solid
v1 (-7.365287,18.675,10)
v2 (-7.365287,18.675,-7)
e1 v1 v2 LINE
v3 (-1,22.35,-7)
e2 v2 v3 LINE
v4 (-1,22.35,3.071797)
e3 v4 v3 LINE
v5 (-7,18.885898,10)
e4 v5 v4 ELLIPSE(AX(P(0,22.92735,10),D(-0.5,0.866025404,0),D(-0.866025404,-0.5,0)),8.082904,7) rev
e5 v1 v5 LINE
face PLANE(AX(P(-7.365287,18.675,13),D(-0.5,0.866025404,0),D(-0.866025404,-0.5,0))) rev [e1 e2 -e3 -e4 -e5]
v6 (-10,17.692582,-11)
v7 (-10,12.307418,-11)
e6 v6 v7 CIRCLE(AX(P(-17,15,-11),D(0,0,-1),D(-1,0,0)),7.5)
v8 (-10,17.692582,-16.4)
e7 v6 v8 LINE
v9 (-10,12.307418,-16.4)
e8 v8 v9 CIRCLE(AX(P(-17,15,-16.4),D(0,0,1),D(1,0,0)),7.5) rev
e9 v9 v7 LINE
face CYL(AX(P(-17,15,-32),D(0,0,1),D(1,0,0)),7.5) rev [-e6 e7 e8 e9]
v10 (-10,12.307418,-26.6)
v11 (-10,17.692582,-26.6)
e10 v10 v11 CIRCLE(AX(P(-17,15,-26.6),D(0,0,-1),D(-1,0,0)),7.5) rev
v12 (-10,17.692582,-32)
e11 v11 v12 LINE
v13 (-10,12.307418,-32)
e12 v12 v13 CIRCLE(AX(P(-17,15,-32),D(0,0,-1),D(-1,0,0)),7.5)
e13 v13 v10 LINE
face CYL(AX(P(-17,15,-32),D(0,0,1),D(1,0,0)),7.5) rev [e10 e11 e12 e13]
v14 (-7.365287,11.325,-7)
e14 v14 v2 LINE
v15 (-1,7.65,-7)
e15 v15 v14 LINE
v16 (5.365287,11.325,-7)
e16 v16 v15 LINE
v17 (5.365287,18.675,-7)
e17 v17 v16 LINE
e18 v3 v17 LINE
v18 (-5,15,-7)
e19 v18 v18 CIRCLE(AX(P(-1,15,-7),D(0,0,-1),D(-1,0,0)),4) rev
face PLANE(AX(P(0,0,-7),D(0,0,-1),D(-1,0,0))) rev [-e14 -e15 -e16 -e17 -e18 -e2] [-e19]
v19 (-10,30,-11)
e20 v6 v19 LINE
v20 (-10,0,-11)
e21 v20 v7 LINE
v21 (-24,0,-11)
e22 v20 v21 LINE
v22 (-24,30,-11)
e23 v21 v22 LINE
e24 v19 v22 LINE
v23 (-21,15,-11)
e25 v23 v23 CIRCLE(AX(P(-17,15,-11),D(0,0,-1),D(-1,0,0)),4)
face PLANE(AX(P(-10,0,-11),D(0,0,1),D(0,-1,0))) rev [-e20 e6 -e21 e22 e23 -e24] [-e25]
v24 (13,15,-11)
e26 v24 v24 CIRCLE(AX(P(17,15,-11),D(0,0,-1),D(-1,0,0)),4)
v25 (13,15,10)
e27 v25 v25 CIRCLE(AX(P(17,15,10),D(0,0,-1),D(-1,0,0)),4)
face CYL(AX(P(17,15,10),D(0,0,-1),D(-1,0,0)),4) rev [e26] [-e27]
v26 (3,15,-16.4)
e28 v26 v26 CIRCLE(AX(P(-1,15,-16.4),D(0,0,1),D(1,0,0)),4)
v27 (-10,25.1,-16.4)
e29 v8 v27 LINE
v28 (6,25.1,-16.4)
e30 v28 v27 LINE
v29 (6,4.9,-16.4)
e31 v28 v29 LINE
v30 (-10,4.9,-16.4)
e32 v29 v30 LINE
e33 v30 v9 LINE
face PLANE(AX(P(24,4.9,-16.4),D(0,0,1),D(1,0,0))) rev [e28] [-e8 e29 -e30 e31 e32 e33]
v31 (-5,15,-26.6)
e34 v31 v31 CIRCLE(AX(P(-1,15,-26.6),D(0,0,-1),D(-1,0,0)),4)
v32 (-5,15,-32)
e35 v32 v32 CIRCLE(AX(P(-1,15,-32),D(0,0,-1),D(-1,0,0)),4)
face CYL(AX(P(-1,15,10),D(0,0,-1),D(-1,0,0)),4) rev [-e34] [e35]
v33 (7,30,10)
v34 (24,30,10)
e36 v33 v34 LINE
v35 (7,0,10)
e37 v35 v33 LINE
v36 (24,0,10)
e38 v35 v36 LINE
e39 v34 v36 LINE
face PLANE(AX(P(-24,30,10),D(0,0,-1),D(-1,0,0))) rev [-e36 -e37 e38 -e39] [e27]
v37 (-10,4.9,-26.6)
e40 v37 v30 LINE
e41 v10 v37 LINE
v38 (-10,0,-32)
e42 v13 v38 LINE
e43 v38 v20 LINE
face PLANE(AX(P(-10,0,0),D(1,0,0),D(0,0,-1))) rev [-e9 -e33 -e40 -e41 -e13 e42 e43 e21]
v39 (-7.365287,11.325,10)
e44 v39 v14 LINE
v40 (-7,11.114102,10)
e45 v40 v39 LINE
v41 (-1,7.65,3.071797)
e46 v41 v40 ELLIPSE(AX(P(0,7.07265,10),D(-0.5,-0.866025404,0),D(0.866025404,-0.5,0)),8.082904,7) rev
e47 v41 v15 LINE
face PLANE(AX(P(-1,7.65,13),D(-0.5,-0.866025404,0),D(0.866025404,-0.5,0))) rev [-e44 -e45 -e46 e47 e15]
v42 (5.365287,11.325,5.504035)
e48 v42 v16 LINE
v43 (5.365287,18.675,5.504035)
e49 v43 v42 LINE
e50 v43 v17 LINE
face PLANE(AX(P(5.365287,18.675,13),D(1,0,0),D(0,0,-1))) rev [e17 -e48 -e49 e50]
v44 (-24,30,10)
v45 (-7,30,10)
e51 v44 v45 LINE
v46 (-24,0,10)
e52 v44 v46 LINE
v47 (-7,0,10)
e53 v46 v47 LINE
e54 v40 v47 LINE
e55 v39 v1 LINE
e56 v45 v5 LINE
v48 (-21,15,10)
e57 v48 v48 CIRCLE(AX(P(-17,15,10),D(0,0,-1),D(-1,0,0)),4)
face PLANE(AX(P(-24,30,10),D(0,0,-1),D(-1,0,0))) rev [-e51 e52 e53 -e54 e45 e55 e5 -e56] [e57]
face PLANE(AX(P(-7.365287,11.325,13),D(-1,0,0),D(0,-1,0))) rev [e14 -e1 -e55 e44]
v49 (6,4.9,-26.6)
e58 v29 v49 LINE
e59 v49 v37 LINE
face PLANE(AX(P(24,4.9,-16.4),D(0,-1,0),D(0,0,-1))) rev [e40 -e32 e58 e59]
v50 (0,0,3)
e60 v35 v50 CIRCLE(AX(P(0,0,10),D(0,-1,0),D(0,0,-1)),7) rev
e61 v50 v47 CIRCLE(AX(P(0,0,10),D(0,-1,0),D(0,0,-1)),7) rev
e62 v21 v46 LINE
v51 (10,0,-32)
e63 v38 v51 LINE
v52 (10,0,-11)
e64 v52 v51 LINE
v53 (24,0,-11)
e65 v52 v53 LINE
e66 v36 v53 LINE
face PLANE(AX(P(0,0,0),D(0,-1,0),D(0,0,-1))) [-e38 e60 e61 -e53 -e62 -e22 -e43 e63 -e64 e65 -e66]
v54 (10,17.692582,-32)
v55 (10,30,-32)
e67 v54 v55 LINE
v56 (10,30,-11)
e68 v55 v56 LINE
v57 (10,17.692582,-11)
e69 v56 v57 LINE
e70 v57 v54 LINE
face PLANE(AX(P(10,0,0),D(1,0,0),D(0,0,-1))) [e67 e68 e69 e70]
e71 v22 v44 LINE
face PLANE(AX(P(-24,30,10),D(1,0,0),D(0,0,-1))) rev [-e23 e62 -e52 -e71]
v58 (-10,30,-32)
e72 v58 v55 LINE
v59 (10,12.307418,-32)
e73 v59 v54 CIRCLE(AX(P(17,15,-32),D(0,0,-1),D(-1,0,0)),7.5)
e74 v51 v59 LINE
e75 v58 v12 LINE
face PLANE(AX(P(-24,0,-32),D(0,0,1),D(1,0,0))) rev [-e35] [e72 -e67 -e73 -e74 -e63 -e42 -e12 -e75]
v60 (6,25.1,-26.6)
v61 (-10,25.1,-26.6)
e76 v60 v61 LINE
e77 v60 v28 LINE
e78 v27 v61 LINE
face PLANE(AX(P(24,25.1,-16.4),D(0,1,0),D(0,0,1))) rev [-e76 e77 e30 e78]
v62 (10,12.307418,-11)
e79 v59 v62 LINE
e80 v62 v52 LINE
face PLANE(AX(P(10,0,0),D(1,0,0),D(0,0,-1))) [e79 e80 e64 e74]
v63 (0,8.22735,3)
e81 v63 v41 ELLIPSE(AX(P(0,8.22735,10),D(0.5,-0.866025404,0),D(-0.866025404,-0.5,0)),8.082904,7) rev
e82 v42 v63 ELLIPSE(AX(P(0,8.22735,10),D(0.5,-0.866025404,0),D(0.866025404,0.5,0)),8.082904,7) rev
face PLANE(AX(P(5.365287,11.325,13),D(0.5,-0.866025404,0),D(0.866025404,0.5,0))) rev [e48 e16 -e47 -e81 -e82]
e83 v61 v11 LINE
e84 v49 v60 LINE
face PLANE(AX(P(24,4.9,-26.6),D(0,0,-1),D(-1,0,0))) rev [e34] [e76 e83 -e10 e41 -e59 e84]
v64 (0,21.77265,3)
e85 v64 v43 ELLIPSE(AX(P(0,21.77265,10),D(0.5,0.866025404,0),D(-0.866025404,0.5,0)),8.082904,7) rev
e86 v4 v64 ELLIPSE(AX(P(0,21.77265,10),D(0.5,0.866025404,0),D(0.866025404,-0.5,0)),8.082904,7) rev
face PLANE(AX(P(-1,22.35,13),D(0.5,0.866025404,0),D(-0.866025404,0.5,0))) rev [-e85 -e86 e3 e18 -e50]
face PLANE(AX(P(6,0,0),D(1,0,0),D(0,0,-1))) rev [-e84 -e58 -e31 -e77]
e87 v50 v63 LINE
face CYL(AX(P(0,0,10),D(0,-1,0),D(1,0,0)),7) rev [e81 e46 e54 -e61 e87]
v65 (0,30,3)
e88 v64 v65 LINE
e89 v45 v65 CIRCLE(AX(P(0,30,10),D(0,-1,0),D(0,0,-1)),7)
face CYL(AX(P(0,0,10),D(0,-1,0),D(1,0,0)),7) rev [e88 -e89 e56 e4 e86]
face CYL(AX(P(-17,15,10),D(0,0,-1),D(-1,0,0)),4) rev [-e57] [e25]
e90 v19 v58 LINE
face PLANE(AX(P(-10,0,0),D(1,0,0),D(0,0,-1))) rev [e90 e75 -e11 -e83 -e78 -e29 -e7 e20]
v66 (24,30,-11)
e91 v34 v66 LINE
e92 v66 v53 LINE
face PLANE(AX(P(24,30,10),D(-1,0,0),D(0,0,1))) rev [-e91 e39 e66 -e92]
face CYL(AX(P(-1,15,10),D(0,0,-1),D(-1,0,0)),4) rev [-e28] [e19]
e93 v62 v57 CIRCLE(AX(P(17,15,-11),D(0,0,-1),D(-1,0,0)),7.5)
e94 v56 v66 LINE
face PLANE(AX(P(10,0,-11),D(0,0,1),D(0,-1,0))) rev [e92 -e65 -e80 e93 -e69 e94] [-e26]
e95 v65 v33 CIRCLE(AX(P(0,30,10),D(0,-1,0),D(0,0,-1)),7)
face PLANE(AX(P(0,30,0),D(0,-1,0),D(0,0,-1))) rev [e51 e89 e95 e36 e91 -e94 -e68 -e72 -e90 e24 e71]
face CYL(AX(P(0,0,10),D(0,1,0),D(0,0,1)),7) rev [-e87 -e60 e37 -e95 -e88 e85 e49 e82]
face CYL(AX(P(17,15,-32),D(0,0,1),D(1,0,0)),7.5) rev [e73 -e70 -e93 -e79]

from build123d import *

# Parameters (mm, degrees)
SKETCH_1_W          = 48
SKETCH_1_H          = 20
EXTRUDE_1_DEPTH     = 30
SKETCH_2_W          = 14
SKETCH_2_H          = 30
CUT_EXTRUDE_1_DEPTH = 7
SKETCH_7_W          = 22
SKETCH_7_H          = 30
EXTRUDE_2_DEPTH     = 48
SKETCH_8_W          = 21
SKETCH_8_H          = 30
CUT_EXTRUDE_2_DEPTH = 14
SKETCH_9_W          = 21
SKETCH_9_H          = 30
CUT_EXTRUDE_3_DEPTH = 14
SKETCH_11_W         = 10.2
SKETCH_11_H         = 20.2
CUT_EXTRUDE_4_DEPTH = 56.497747702
SKETCH_13_R         = 4
CUT_EXTRUDE_5_DEPTH = 44.783558558
SKETCH_14_R         = 4
CUT_EXTRUDE_6_DEPTH = 44.783558558
FILLET_1_R          = 7
SKETCH1_W           = 10.2
SKETCH1_H           = 20.2
BOSS_EXTRUDE1_DEPTH = 4
SKETCH_20_R         = 7.5
CUT_EXTRUDE_8_DEPTH = 44.783558558
SKETCH3_R           = 4
CUT_EXTRUDE2_DEPTH  = 57.920997883
CUT_EXTRUDE3_START  = -25
CUT_EXTRUDE3_DEPTH  = 20


with BuildPart() as part:
    # Эскиз1 → Бобышка-Вытянуть1 (new body)
    with BuildSketch(Plane(origin=(0, 0, 0), x_dir=(1, 0, 0), z_dir=(0, 1, 0))):
        Rectangle(SKETCH_1_W, SKETCH_1_H)
    extrude(amount=EXTRUDE_1_DEPTH)

    # Эскиз2 → Вырез-Вытянуть1 (cut)
    with BuildSketch(Plane.XY.offset(10)):
        with Locations((0, 15)):
            Rectangle(SKETCH_2_W, SKETCH_2_H)
    extrude(amount=-CUT_EXTRUDE_1_DEPTH, mode=Mode.SUBTRACT)

    # Эскиз7 → Бобышка-Вытянуть2 (add)
    with BuildSketch(Plane(origin=(24, 0, 0), x_dir=(0, 0, -1), z_dir=(1, 0, 0))):
        with Locations((21, 15)):
            Rectangle(SKETCH_7_W, SKETCH_7_H)
    extrude(amount=-EXTRUDE_2_DEPTH)

    # Эскиз8 → Вырез-Вытянуть2 (cut)
    with BuildSketch(Plane(origin=(24, 0, 0), x_dir=(0, 0, -1), z_dir=(1, 0, 0))):
        with Locations((21.5, 15)):
            Rectangle(SKETCH_8_W, SKETCH_8_H)
    extrude(amount=-CUT_EXTRUDE_2_DEPTH, mode=Mode.SUBTRACT)

    # Эскиз9 → Вырез-Вытянуть3 (cut)
    with BuildSketch(Plane.ZY.offset(24)):
        with Locations((-21.5, 15)):
            Rectangle(SKETCH_9_W, SKETCH_9_H)
    extrude(amount=-CUT_EXTRUDE_3_DEPTH, mode=Mode.SUBTRACT)

    # Эскиз11 → Вырез-Вытянуть4 (cut, through all)
    with BuildSketch(Plane.ZY.offset(10)):
        with Locations((-21.5, 15)):
            Rectangle(SKETCH_11_W, SKETCH_11_H)
    extrude(amount=-CUT_EXTRUDE_4_DEPTH, mode=Mode.SUBTRACT)

    # Эскиз13 → Вырез-Вытянуть5 (cut, through all)
    with BuildSketch(Plane(origin=(0, 0, -11), x_dir=(-1, 0, 0), z_dir=(0, 0, -1))):
        with Locations((17, 15)):
            Circle(SKETCH_13_R)
    extrude(amount=-CUT_EXTRUDE_5_DEPTH, mode=Mode.SUBTRACT)

    # Эскиз14 → Вырез-Вытянуть6 (cut, through all)
    with BuildSketch(Plane(origin=(0, 0, -11), x_dir=(-1, 0, 0), z_dir=(0, 0, -1))):
        with Locations((-17, 15)):
            Circle(SKETCH_14_R)
    extrude(amount=-CUT_EXTRUDE_6_DEPTH, mode=Mode.SUBTRACT)

    # Скругление1
    fillet_1_edges = [part.edges().sort_by_distance(p)[0] for p in [
        (-7, 15, 3),
        (7, 15, 3),
    ]]
    fillet(fillet_1_edges, radius=FILLET_1_R - 0.0001)  # a hair under: the kernel refuses the full size

    # Sketch1 → Boss-Extrude1 (add)
    with BuildSketch(Plane(origin=(10, 0, 0), x_dir=(0, 0, -1), z_dir=(1, 0, 0))):
        with Locations((21.5, 15)):
            Rectangle(SKETCH1_W, SKETCH1_H)
    extrude(amount=-BOSS_EXTRUDE1_DEPTH)

    # Эскиз20 → Вырез-Вытянуть8 (cut, through all)
    with BuildSketch(Plane(origin=(0, 0, -11), x_dir=(-1, 0, 0), z_dir=(0, 0, -1))):
        with Locations((-17, 15)):
            Circle(SKETCH_20_R)
        with Locations((17, 15)):
            Circle(SKETCH_20_R)
    extrude(amount=CUT_EXTRUDE_8_DEPTH, mode=Mode.SUBTRACT)

    # Sketch3 → Cut-Extrude2 (cut, through all)
    with BuildSketch(Plane(origin=(0, 0, -32), x_dir=(-1, 0, 0), z_dir=(0, 0, -1))):
        with Locations(Location((1, 15, 0), (0, 0, 255.522487814))):
            Circle(SKETCH3_R)
    extrude(amount=-CUT_EXTRUDE2_DEPTH, mode=Mode.SUBTRACT)

    # Sketch4 → Cut-Extrude3 (cut)
    with BuildSketch(Plane(origin=(0, 0, -32), x_dir=(-1, 0, 0), z_dir=(0, 0, -1)).offset(CUT_EXTRUDE3_START)):
        Polygon((1, 22.35), (-5.365286718, 18.675), (-5.365286718, 11.325), (1, 7.65), (7.365286718, 11.325), (7.365286718, 18.675), align=None)
    extrude(amount=-CUT_EXTRUDE3_DEPTH, mode=Mode.SUBTRACT)


solid = part.part
